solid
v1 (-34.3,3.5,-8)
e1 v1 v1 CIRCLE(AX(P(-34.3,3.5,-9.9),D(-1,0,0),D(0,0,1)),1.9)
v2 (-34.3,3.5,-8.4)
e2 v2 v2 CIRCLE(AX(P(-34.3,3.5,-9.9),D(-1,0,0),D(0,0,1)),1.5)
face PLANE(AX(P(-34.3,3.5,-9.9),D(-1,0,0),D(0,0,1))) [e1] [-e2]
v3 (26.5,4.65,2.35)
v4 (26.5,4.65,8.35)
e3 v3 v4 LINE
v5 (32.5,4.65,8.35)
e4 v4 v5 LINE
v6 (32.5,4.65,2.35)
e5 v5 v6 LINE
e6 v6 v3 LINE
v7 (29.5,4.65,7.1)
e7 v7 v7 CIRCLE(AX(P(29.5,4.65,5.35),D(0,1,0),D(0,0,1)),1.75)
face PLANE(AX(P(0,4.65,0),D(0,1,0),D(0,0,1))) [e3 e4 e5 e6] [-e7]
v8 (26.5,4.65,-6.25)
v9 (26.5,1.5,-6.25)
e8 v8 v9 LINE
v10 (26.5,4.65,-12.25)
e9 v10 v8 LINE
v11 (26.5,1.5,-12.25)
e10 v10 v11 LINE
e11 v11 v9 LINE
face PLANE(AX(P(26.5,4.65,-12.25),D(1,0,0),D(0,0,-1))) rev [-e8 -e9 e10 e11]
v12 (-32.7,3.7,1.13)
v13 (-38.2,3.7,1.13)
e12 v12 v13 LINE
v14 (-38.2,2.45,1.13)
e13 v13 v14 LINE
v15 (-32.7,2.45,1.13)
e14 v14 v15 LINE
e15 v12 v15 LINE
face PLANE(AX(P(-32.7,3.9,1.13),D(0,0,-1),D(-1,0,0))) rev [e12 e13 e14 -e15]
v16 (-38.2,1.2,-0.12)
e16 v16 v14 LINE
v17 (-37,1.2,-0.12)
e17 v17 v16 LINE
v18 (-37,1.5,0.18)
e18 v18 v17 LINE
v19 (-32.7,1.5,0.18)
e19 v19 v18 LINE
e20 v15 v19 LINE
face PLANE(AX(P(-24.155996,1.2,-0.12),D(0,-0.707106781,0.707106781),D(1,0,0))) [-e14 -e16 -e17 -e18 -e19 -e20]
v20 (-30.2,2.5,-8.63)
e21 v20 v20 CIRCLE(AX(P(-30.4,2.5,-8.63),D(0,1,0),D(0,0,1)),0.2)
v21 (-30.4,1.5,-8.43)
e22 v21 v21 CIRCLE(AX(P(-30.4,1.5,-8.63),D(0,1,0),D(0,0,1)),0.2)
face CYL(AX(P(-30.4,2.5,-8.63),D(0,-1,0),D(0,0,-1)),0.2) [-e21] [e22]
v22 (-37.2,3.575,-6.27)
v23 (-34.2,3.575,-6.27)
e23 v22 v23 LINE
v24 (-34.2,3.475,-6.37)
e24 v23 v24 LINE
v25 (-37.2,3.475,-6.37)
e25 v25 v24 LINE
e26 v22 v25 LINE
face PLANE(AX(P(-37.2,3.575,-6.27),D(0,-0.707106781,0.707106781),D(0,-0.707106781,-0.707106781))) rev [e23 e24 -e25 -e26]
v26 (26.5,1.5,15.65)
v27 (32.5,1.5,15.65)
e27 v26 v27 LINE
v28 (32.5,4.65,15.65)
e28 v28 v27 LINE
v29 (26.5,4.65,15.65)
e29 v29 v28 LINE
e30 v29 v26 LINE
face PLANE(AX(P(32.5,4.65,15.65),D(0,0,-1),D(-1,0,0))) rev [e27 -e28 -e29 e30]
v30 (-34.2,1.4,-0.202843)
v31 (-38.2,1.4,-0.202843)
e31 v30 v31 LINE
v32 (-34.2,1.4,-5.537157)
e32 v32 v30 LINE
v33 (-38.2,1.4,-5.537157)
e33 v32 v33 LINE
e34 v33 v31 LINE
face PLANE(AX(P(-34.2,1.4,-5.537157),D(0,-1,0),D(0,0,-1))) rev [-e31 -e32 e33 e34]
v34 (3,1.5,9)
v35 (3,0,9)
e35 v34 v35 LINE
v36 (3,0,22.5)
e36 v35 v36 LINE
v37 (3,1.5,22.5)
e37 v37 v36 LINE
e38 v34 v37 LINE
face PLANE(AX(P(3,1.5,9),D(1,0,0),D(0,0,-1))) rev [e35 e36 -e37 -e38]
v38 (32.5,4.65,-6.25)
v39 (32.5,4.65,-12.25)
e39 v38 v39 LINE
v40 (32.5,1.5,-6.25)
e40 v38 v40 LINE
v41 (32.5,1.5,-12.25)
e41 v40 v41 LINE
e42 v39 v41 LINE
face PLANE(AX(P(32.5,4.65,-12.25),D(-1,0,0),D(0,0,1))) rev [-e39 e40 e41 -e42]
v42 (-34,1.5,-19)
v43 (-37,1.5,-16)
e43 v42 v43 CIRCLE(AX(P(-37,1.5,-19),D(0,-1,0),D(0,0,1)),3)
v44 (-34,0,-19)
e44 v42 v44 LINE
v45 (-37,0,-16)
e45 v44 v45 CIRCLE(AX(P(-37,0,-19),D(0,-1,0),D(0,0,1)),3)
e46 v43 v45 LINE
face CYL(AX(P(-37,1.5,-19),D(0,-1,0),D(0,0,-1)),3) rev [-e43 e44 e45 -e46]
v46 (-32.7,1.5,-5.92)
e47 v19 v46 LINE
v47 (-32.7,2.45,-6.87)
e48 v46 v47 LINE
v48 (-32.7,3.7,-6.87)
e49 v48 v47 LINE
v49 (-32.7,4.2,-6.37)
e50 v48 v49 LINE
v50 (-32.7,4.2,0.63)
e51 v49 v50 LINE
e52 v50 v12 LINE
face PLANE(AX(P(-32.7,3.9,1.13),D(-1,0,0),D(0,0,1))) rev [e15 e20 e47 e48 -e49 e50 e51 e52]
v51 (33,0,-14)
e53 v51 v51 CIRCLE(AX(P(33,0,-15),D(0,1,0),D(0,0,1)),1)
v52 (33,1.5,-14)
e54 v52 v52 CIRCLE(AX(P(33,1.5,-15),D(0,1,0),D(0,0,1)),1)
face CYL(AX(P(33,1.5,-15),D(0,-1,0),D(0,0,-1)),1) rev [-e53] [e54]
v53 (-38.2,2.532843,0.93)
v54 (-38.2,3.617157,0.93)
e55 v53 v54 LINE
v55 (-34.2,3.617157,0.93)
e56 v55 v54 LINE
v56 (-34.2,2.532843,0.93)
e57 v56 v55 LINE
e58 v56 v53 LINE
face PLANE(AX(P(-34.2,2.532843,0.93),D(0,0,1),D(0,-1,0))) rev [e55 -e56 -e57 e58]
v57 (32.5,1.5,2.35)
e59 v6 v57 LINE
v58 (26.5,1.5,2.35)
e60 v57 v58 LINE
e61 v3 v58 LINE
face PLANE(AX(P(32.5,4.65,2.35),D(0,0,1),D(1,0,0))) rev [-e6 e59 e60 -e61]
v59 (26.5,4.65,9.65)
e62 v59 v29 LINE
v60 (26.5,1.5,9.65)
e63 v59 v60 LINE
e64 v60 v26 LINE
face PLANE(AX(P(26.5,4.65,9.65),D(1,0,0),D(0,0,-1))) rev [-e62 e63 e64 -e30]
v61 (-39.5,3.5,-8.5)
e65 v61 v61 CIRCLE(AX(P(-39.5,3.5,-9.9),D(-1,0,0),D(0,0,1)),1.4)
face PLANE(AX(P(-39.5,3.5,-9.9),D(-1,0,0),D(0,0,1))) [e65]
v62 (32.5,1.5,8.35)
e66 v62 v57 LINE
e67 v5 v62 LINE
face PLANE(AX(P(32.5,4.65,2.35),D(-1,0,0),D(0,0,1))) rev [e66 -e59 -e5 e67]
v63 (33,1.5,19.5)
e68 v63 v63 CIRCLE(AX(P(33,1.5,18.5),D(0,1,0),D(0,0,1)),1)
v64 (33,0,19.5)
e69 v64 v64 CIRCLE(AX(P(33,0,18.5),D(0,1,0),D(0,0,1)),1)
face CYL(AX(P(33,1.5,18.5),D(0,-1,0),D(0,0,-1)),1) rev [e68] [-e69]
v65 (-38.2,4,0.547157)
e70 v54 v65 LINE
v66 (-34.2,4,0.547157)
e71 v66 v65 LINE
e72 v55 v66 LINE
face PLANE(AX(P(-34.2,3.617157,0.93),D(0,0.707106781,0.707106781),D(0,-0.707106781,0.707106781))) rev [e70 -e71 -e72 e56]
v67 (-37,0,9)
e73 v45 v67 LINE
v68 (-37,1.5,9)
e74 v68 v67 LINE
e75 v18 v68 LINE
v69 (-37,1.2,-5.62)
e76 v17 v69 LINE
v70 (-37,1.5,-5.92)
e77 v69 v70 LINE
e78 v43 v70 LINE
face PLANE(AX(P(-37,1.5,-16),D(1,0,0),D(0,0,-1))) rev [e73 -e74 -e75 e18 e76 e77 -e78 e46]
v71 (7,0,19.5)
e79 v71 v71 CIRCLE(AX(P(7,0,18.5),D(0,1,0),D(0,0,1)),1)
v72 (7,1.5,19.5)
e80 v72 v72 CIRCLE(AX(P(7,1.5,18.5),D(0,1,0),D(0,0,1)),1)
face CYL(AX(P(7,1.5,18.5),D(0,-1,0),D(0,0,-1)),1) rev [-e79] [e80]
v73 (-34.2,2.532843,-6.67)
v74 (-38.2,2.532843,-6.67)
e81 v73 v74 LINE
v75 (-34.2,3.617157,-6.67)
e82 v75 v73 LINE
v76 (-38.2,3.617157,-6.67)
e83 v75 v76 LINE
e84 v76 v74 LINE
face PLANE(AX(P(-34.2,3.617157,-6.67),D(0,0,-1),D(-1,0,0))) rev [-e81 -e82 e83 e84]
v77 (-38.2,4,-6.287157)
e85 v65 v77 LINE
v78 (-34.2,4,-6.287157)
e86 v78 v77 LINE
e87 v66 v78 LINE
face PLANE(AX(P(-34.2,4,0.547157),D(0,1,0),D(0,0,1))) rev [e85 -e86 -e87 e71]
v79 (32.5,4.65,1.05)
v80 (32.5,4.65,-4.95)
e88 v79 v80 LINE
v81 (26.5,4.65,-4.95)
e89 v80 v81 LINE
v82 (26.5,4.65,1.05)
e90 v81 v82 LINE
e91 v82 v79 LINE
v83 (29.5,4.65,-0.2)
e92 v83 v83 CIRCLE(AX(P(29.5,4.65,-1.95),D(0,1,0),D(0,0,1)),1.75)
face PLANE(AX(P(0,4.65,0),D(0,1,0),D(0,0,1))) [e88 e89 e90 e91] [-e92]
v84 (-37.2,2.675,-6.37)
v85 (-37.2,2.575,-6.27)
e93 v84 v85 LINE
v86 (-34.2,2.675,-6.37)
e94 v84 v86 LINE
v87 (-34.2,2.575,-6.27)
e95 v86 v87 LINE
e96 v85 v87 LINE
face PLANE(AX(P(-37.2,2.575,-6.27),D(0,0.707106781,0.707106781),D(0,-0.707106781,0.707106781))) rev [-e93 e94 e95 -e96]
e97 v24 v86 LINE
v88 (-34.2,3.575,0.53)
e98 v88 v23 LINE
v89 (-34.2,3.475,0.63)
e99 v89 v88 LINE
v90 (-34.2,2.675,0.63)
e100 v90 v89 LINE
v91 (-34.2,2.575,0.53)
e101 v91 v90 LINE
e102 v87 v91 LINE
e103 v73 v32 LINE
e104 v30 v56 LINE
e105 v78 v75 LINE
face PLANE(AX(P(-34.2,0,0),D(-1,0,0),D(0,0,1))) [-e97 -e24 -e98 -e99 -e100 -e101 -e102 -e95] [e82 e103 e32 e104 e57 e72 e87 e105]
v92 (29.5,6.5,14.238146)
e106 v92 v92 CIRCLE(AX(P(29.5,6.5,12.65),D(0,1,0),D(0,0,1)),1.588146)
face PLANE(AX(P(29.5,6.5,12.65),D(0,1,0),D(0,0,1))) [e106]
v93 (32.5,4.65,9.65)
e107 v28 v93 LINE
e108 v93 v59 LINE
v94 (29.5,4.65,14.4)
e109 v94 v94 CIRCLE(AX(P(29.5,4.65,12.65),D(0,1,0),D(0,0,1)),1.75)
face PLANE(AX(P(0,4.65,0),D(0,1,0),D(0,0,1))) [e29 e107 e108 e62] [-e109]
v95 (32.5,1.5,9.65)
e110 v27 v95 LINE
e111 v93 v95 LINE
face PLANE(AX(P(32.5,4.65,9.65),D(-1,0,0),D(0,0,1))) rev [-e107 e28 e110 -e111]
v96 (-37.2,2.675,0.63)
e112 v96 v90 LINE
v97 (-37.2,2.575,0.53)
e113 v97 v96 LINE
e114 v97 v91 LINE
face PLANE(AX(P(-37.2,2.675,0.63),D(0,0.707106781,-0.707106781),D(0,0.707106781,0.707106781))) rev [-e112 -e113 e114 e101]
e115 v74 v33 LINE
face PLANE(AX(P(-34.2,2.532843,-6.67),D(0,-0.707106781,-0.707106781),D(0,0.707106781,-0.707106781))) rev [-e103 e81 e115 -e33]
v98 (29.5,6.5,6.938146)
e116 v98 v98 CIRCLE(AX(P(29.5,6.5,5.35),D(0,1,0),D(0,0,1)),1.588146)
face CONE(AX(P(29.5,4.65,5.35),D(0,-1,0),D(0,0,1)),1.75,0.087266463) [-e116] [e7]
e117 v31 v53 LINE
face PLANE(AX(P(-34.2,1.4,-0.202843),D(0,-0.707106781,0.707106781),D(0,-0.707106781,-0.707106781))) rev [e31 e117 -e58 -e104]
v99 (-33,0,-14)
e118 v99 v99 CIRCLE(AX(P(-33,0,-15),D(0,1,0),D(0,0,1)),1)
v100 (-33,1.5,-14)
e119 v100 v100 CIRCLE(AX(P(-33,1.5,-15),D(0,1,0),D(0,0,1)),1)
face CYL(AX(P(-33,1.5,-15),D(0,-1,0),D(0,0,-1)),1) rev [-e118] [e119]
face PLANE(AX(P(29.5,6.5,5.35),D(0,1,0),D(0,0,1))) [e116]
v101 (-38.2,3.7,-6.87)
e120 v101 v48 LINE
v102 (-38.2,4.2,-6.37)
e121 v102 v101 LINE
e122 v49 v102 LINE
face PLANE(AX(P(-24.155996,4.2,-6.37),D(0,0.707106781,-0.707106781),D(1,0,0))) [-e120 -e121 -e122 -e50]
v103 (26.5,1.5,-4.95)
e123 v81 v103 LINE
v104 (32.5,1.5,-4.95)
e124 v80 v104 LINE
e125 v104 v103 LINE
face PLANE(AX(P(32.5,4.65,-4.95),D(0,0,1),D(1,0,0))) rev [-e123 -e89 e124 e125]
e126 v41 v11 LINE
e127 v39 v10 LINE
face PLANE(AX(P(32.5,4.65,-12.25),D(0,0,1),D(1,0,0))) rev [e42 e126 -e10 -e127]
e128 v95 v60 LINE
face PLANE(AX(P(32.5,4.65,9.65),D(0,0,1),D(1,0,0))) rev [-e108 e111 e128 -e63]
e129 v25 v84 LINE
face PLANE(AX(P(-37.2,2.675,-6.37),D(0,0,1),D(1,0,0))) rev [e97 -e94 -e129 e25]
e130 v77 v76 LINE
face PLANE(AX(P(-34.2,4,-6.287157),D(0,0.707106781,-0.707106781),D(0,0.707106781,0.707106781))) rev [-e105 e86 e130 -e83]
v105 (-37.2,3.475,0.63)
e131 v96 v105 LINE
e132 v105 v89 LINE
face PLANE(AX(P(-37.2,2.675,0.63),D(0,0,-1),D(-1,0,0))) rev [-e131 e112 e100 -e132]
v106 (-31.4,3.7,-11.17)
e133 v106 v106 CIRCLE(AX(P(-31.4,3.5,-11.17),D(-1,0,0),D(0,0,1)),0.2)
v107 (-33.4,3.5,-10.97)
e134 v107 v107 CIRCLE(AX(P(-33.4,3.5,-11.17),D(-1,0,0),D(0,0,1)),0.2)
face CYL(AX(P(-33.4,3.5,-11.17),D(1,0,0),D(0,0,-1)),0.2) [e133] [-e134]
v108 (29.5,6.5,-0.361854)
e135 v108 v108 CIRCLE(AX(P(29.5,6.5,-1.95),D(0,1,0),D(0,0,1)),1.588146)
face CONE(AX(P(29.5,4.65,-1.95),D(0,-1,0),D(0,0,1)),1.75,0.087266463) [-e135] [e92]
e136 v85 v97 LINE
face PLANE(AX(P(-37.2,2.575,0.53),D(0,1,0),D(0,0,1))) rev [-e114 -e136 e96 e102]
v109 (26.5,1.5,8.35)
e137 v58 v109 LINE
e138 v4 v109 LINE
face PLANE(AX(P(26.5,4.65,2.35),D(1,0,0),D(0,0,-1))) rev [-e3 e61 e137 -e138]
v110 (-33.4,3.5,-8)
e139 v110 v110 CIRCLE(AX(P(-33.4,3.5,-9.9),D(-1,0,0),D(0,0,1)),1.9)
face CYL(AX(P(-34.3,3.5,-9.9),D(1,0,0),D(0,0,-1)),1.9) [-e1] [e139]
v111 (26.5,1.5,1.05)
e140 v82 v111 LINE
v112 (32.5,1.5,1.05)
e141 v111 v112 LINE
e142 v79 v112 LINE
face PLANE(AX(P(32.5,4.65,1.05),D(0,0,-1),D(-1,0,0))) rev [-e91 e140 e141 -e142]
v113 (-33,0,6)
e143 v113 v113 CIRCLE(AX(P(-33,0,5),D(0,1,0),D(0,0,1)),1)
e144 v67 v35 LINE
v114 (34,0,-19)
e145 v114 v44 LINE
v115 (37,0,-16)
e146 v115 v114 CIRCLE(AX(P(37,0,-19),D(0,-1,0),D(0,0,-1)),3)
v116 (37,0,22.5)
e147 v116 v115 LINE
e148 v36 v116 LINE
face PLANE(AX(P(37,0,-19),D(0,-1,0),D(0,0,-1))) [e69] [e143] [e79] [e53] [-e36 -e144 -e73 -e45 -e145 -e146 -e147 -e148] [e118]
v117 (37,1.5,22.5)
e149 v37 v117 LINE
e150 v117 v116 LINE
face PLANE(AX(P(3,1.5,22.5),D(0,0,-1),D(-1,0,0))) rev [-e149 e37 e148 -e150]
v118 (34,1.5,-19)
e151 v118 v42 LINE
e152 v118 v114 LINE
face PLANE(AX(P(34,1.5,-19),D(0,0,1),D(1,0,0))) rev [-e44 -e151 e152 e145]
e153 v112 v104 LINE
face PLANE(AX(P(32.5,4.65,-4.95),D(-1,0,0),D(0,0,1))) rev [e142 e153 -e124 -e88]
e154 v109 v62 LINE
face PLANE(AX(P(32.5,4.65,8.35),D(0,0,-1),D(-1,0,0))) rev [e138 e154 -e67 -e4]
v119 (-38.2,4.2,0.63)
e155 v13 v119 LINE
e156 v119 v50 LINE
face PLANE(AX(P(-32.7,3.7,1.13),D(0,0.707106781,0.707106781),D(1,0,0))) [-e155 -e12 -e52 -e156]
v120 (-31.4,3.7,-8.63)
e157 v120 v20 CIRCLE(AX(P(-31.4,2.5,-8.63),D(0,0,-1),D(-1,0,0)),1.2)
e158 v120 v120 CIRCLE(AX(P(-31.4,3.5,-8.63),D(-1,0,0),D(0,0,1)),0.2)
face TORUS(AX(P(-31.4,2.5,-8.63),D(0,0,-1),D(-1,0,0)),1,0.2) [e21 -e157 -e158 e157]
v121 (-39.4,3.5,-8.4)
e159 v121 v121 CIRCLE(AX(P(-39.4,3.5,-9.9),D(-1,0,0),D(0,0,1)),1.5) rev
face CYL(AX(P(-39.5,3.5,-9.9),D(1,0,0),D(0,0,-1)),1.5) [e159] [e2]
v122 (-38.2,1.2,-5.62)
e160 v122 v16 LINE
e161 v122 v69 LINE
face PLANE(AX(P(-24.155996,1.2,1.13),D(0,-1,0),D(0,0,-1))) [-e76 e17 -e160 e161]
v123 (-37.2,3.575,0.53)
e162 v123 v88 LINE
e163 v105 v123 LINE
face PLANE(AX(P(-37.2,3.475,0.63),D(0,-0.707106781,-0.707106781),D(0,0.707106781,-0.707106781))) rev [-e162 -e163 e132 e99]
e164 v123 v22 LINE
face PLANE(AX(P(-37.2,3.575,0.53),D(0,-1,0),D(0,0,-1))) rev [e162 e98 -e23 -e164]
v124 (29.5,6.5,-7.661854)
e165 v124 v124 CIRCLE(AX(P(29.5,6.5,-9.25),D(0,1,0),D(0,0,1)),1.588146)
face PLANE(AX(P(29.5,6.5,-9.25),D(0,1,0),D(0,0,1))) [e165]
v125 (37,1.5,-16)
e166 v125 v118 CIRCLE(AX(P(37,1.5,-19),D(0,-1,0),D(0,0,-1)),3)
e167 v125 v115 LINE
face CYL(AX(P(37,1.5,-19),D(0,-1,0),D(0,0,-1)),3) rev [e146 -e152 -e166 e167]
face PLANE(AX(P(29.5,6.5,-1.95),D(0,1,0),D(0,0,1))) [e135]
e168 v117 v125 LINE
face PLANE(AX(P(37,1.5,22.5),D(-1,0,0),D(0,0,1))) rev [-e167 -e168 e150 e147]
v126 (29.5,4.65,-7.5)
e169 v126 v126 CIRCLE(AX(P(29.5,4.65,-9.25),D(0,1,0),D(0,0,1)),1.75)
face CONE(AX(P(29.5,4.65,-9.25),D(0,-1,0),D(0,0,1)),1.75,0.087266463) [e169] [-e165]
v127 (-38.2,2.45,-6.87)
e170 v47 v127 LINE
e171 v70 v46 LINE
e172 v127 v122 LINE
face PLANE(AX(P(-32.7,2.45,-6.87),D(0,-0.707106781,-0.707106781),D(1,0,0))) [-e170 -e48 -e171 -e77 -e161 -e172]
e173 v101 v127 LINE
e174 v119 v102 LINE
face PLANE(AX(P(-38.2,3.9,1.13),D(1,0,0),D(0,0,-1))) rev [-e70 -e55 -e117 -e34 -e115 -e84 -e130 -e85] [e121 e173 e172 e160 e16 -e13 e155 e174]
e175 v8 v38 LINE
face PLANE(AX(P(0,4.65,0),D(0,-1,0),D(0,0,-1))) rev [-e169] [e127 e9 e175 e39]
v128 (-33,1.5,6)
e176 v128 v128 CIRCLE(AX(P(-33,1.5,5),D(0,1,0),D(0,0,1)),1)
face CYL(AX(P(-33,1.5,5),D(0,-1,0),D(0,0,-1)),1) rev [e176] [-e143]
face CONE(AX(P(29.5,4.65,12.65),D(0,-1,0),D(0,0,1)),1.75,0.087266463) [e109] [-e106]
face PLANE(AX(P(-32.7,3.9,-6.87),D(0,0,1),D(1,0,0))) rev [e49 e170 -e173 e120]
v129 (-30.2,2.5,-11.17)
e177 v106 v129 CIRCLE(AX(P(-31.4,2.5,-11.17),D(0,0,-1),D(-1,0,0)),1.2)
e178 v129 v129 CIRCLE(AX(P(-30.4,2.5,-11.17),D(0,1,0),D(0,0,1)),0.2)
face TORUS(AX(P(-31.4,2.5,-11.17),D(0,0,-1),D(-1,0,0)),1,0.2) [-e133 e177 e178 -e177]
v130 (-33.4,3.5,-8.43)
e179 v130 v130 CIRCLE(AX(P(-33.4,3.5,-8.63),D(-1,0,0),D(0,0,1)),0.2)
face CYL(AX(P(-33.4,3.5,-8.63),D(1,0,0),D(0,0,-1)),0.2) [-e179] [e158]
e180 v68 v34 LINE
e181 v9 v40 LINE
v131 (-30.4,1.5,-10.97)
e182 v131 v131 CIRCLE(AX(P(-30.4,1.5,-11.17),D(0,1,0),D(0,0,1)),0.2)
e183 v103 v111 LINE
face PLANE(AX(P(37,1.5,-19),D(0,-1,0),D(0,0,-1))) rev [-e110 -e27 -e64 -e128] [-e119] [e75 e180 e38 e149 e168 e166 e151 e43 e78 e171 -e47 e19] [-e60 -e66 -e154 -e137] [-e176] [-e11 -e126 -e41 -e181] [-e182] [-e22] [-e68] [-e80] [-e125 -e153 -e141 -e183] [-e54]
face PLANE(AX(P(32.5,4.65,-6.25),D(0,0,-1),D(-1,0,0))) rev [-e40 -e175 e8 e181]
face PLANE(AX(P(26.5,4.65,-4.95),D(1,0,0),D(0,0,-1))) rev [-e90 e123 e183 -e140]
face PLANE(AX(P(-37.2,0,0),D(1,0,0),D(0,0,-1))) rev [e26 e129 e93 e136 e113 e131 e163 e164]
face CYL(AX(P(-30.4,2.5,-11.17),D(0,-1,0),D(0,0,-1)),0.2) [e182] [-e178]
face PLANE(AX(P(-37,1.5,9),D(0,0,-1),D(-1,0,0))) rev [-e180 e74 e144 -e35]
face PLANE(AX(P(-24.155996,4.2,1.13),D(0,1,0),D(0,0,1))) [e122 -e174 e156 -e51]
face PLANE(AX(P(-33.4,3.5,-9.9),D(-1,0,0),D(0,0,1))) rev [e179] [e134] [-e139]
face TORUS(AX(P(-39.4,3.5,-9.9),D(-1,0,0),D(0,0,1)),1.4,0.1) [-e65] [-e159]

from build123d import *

# Parameters (mm, degrees)
SKETCH_1_R                = 1
EXTRUDE_1_DEPTH           = 1.5
SKETCH_2_W                = 6
SKETCH_2_H                = 6
EXTRUDE_2_DEPTH           = 3.15
SKETCH_3_R                = 1.75
EXTRUDE_3_DEPTH           = 1.85
EXTRUDE_3_DRAFT           = 5
EXTRUDE_3_PROFILE_2_DEPTH = 1.85
EXTRUDE_3_PROFILE_2_DRAFT = 5
EXTRUDE_3_PROFILE_3_DEPTH = 1.85
EXTRUDE_3_PROFILE_3_DRAFT = 5
EXTRUDE_3_PROFILE_4_DEPTH = 1.85
EXTRUDE_3_PROFILE_4_DRAFT = 5
SKETCH_4_W                = 5.5
SKETCH_4_H                = 8
EXTRUDE_4_DEPTH           = 2.4
EXTRUDE_5_REACH           = 80.763
SKETCH_5_W                = 8
SKETCH_5_H                = 3
CHAMFER_1_SIZE            = 0.5
SKETCH_6_R                = 0.2
SKETCH_8_R                = 1.9
EXTRUDE_6_DEPTH           = 0.9
SKETCH_9_R                = 1.5
EXTRUDE_7_DEPTH           = 5.2
CUT_EXTRUDE_1_DEPTH       = 4
EXTRUDE_8_DEPTH           = 3
FILLET_1_R                = 0.1


with BuildPart() as part:
    # Эскиз1 → Бобышка-Вытянуть1 (new body)
    with BuildSketch(Plane(origin=(0, 0, 0), x_dir=(1, 0, 0), z_dir=(0, 1, 0))):
        with BuildLine():
            Line((-37, -9), (3, -9))
            Line((3, -9), (3, -22.5))
            Line((3, -22.5), (37, -22.5))
            Line((37, -22.5), (37, 16))
            ThreePointArc((37, 16), (34.878679656, 16.878679656), (34, 19))
            Line((34, 19), (-34, 19))
            ThreePointArc((-34, 19), (-34.878679656, 16.878679656), (-37, 16))
            Line((-37, 16), (-37, -9))
        make_face()
        with Locations(Location((-33, -5, 0), (0, 0, 270))):
            Circle(SKETCH_1_R, mode=Mode.SUBTRACT)
        with Locations(Location((33, -18.5, 0), (0, 0, 270))):
            Circle(SKETCH_1_R, mode=Mode.SUBTRACT)
        with Locations(Location((7, -18.5, 0), (0, 0, 270))):
            Circle(SKETCH_1_R, mode=Mode.SUBTRACT)
        with Locations(Location((-33, 15, 0), (0, 0, 270))):
            Circle(SKETCH_1_R, mode=Mode.SUBTRACT)
        with Locations(Location((33, 15, 0), (0, 0, 270))):
            Circle(SKETCH_1_R, mode=Mode.SUBTRACT)
    extrude(amount=EXTRUDE_1_DEPTH)

    # Эскиз2 → Бобышка-Вытянуть2 (add)
    with BuildSketch(Plane(origin=(0, 1.5, 0), x_dir=(1, 0, 0), z_dir=(0, 1, 0))):
        with Locations((29.5, 1.95)):
            Rectangle(SKETCH_2_W, SKETCH_2_H)
        with Locations((29.5, 9.25)):
            Rectangle(SKETCH_2_W, SKETCH_2_H)
        with Locations((29.5, -5.35)):
            Rectangle(SKETCH_2_W, SKETCH_2_H)
        with Locations((29.5, -12.65)):
            Rectangle(SKETCH_2_W, SKETCH_2_H)
    extrude(amount=EXTRUDE_2_DEPTH)


with BuildPart() as extrude_3_tool:
    # Эскиз3 → Бобышка-Вытянуть3 (with draft: the straight prism first)
    with BuildSketch(Plane(origin=(0, 4.65, 0), x_dir=(1, 0, 0), z_dir=(0, 1, 0))):
        with Locations((29.5, 9.25)):
            Circle(SKETCH_3_R)
    extrude(amount=EXTRUDE_3_DEPTH)
    # Бобышка-Вытянуть3: the draft: its side faces are tilted about the plane it starts from
    extrude_3_sides = [extrude_3_tool.faces().sort_by_distance(p)[0] for p in [
        (27.75, 5.575, -9.25),
    ]]
    draft(extrude_3_sides, Plane(origin=(0, 4.65, 0), x_dir=(1, 0, 0), z_dir=(0, 1, 0)), EXTRUDE_3_DRAFT)


with BuildPart() as part_1:
    add(part.part)

    # Бобышка-Вытянуть3: add extrude_3_tool
    add(extrude_3_tool.part)


with BuildPart() as extrude_3_profile_2_tool:
    # Эскиз3 → Бобышка-Вытянуть3 profile 2 (with draft: the straight prism first)
    with BuildSketch(Plane(origin=(0, 4.65, 0), x_dir=(1, 0, 0), z_dir=(0, 1, 0))):
        with Locations((29.5, 1.95)):
            Circle(SKETCH_3_R)
    extrude(amount=EXTRUDE_3_PROFILE_2_DEPTH)
    # Бобышка-Вытянуть3 profile 2: the draft: its side faces are tilted about the plane it starts from
    extrude_3_profile_2_sides = [extrude_3_profile_2_tool.faces().sort_by_distance(p)[0] for p in [
        (27.75, 5.575, -1.95),
    ]]
    draft(extrude_3_profile_2_sides, Plane(origin=(0, 4.65, 0), x_dir=(1, 0, 0), z_dir=(0, 1, 0)), EXTRUDE_3_PROFILE_2_DRAFT)


with BuildPart() as part_2:
    add(part_1.part)

    # Бобышка-Вытянуть3 profile 2: add extrude_3_profile_2_tool
    add(extrude_3_profile_2_tool.part)


with BuildPart() as extrude_3_profile_3_tool:
    # Эскиз3 → Бобышка-Вытянуть3 profile 3 (with draft: the straight prism first)
    with BuildSketch(Plane(origin=(0, 4.65, 0), x_dir=(1, 0, 0), z_dir=(0, 1, 0))):
        with Locations((29.5, -5.35)):
            Circle(SKETCH_3_R)
    extrude(amount=EXTRUDE_3_PROFILE_3_DEPTH)
    # Бобышка-Вытянуть3 profile 3: the draft: its side faces are tilted about the plane it starts from
    extrude_3_profile_3_sides = [extrude_3_profile_3_tool.faces().sort_by_distance(p)[0] for p in [
        (27.75, 5.575, 5.35),
    ]]
    draft(extrude_3_profile_3_sides, Plane(origin=(0, 4.65, 0), x_dir=(1, 0, 0), z_dir=(0, 1, 0)), EXTRUDE_3_PROFILE_3_DRAFT)


with BuildPart() as part_3:
    add(part_2.part)

    # Бобышка-Вытянуть3 profile 3: add extrude_3_profile_3_tool
    add(extrude_3_profile_3_tool.part)


with BuildPart() as extrude_3_profile_4_tool:
    # Эскиз3 → Бобышка-Вытянуть3 profile 4 (with draft: the straight prism first)
    with BuildSketch(Plane(origin=(0, 4.65, 0), x_dir=(1, 0, 0), z_dir=(0, 1, 0))):
        with Locations((29.5, -12.65)):
            Circle(SKETCH_3_R)
    extrude(amount=EXTRUDE_3_PROFILE_4_DEPTH)
    # Бобышка-Вытянуть3 profile 4: the draft: its side faces are tilted about the plane it starts from
    extrude_3_profile_4_sides = [extrude_3_profile_4_tool.faces().sort_by_distance(p)[0] for p in [
        (27.75, 5.575, 12.65),
    ]]
    draft(extrude_3_profile_4_sides, Plane(origin=(0, 4.65, 0), x_dir=(1, 0, 0), z_dir=(0, 1, 0)), EXTRUDE_3_PROFILE_4_DRAFT)


with BuildPart() as part_4:
    add(part_3.part)

    # Бобышка-Вытянуть3 profile 4: add extrude_3_profile_4_tool
    add(extrude_3_profile_4_tool.part)

    # Эскиз4 → Бобышка-Вытянуть4 (add)
    with BuildSketch(Plane(origin=(0, 1.5, 0), x_dir=(1, 0, 0), z_dir=(0, 1, 0))):
        with Locations((-35.45, 2.87)):
            Rectangle(SKETCH_4_W, SKETCH_4_H)
    extrude(amount=EXTRUDE_4_DEPTH)

    # Бобышка-Вытянуть5: up to this face of the body (flat: up to its plane)
    extrude_5_end = Plane(part_4.part.faces().sort_by_distance((-32.7, 2.7, -2.87))[0])
    # Эскиз5 → Бобышка-Вытянуть5 (add, up to the picked face)
    with BuildSketch(Plane.ZY.offset(38.2), mode=Mode.PRIVATE) as extrude_5_sk1:
        with Locations((-2.87, 2.7)):
            Rectangle(SKETCH_5_W, SKETCH_5_H)
    extrude_5_tool1 = split(extrude(extrude_5_sk1.sketch, amount=-EXTRUDE_5_REACH, mode=Mode.PRIVATE), bisect_by=extrude_5_end, keep=Keep.BOTH, mode=Mode.PRIVATE)
    add(extrude_5_tool1.solids().sort_by(Axis((-38.2, 2.7, -2.87), (1, 0, 0)))[0])

    # Фаска1
    chamfer_1_edges = [part_4.edges().sort_by_distance(p)[0] for p in [
        (-35.45, 4.2, -6.87),
        (-35.45, 4.2, 1.13),
    ]]
    chamfer(chamfer_1_edges, length=CHAMFER_1_SIZE)

    # Фаска2
    # the kernel refuses this chamfer: 1.25 mm, written as the material it takes off along each edge
    with BuildSketch(Plane(origin=(-45.915048964, 1.2, 1.13), x_dir=(0, -0.02749587661058649, -0.9996219169112968), z_dir=(1, 0, 0))) as chamfer_2_piece_1_section:
        with BuildLine():
            Line((1.285841494, 0), (-0.070683944, 1.283897242))
            Line((-0.070683944, 1.283897242), (-0.095674492, 1.283209845))
            ThreePointArc((-0.095674492, 1.283209845), (-0.042661534, 0.641747287), (-0.024990548, -0.000687397))
            Line((-0.024990548, -0.000687397), (0.000687397, -0.024990548))
            ThreePointArc((0.000687397, -0.024990548), (0.643122081, -0.007319562), (1.286528891, -0.024990548))
            Line((1.286528891, -0.024990548), (1.285841494, 0))
        make_face()
    chamfer_2_piece_1 = extrude(amount=8.915048964, mode=Mode.PRIVATE)
    chamfer_2_piece_1 = split(chamfer_2_piece_1, bisect_by=Plane(origin=(-41.457524482, 1.5, 0.565873804), z_dir=(0, -1, 0)), keep=Keep.TOP, mode=Mode.PRIVATE)
    add(chamfer_2_piece_1, mode=Mode.SUBTRACT)
    with BuildSketch(Plane(origin=(-45.915048964, 1.2, 1.13), x_dir=(0, -0.02749587661058649, -0.9996219169112968), z_dir=(1, 0, 0))) as chamfer_2_piece_2_section:
        with BuildLine():
            Line((1.285841494, 0), (-0.070683944, 1.283897242))
            Line((-0.070683944, 1.283897242), (-0.095674492, 1.283209845))
            ThreePointArc((-0.095674492, 1.283209845), (-0.042661534, 0.641747287), (-0.024990548, -0.000687397))
            Line((-0.024990548, -0.000687397), (0.000687397, -0.024990548))
            ThreePointArc((0.000687397, -0.024990548), (0.643122081, -0.007319562), (1.286528891, -0.024990548))
            Line((1.286528891, -0.024990548), (1.285841494, 0))
        make_face()
    chamfer_2_piece_2 = extrude(amount=8.915048964, mode=Mode.PRIVATE)
    chamfer_2_piece_2 = split(chamfer_2_piece_2, bisect_by=Plane(origin=(-41.457524482, 1.5, 0.835841418), z_dir=(0, 1, 0)), keep=Keep.TOP, mode=Mode.PRIVATE)
    add(chamfer_2_piece_2, mode=Mode.SUBTRACT)
    with BuildSketch(Plane(origin=(-45.915048964, 1.2, 1.13), x_dir=(0, -0.02749587661058649, -0.9996219169112968), z_dir=(1, 0, 0))) as chamfer_2_piece_3_section:
        with BuildLine():
            Line((1.285841494, 0), (-0.070683944, 1.283897242))
            Line((-0.070683944, 1.283897242), (-0.095674492, 1.283209845))
            ThreePointArc((-0.095674492, 1.283209845), (-0.042661534, 0.641747287), (-0.024990548, -0.000687397))
            Line((-0.024990548, -0.000687397), (0.000687397, -0.024990548))
            ThreePointArc((0.000687397, -0.024990548), (0.643122081, -0.007319562), (1.286528891, -0.024990548))
            Line((1.286528891, -0.024990548), (1.285841494, 0))
        make_face()
    chamfer_2_piece_3 = extrude(amount=16.630097928, mode=Mode.PRIVATE)
    chamfer_2_piece_3 = split(chamfer_2_piece_3, bisect_by=Plane(origin=(-37, 1.834493802, 0.835841418), z_dir=(1, 0, 0)), keep=Keep.TOP, mode=Mode.PRIVATE)
    chamfer_2_piece_3 = split(chamfer_2_piece_3, bisect_by=Plane(origin=(-33.142475518, 1.5, 0.835841418), z_dir=(0, 1, 0)), keep=Keep.TOP, mode=Mode.PRIVATE)
    add(chamfer_2_piece_3, mode=Mode.SUBTRACT)
    with BuildSketch(Plane(origin=(-45.915048964, 1.2, -6.87), x_dir=(0, 0.9996219169112968, -0.027495876610586317), z_dir=(1, 0, 0))) as chamfer_2_piece_4_section:
        with BuildLine():
            Line((1.285841494, 0), (-0.070683944, 1.283897242))
            Line((-0.070683944, 1.283897242), (-0.095674492, 1.283209845))
            ThreePointArc((-0.095674492, 1.283209845), (-0.042661534, 0.641747287), (-0.024990548, -0.000687397))
            Line((-0.024990548, -0.000687397), (0.000687397, -0.024990548))
            ThreePointArc((0.000687397, -0.024990548), (0.643122081, -0.007319562), (1.286528891, -0.024990548))
            Line((1.286528891, -0.024990548), (1.285841494, 0))
        make_face()
    chamfer_2_piece_4 = extrude(amount=8.915048964, mode=Mode.PRIVATE)
    chamfer_2_piece_4 = split(chamfer_2_piece_4, bisect_by=Plane(origin=(-41.457524482, 1.5, -6.575841418), z_dir=(0, 1, 0)), keep=Keep.TOP, mode=Mode.PRIVATE)
    add(chamfer_2_piece_4, mode=Mode.SUBTRACT)
    with BuildSketch(Plane(origin=(-45.915048964, 1.2, -6.87), x_dir=(0, 0.9996219169112968, -0.027495876610586317), z_dir=(1, 0, 0))) as chamfer_2_piece_5_section:
        with BuildLine():
            Line((1.285841494, 0), (-0.070683944, 1.283897242))
            Line((-0.070683944, 1.283897242), (-0.095674492, 1.283209845))
            ThreePointArc((-0.095674492, 1.283209845), (-0.042661534, 0.641747287), (-0.024990548, -0.000687397))
            Line((-0.024990548, -0.000687397), (0.000687397, -0.024990548))
            ThreePointArc((0.000687397, -0.024990548), (0.643122081, -0.007319562), (1.286528891, -0.024990548))
            Line((1.286528891, -0.024990548), (1.285841494, 0))
        make_face()
    chamfer_2_piece_5 = extrude(amount=8.915048964, mode=Mode.PRIVATE)
    chamfer_2_piece_5 = split(chamfer_2_piece_5, bisect_by=Plane(origin=(-41.457524482, 1.5, -6.305873804), z_dir=(0, -1, 0)), keep=Keep.TOP, mode=Mode.PRIVATE)
    add(chamfer_2_piece_5, mode=Mode.SUBTRACT)
    with BuildSketch(Plane(origin=(-45.915048964, 1.2, -6.87), x_dir=(0, 0.9996219169112968, -0.027495876610586317), z_dir=(1, 0, 0))) as chamfer_2_piece_6_section:
        with BuildLine():
            Line((1.285841494, 0), (-0.070683944, 1.283897242))
            Line((-0.070683944, 1.283897242), (-0.095674492, 1.283209845))
            ThreePointArc((-0.095674492, 1.283209845), (-0.042661534, 0.641747287), (-0.024990548, -0.000687397))
            Line((-0.024990548, -0.000687397), (0.000687397, -0.024990548))
            ThreePointArc((0.000687397, -0.024990548), (0.643122081, -0.007319562), (1.286528891, -0.024990548))
            Line((1.286528891, -0.024990548), (1.285841494, 0))
        make_face()
    chamfer_2_piece_6 = extrude(amount=16.630097928, mode=Mode.PRIVATE)
    chamfer_2_piece_6 = split(chamfer_2_piece_6, bisect_by=Plane(origin=(-37, 1.834493802, -6.575841418), z_dir=(1, 0, 0)), keep=Keep.TOP, mode=Mode.PRIVATE)
    chamfer_2_piece_6 = split(chamfer_2_piece_6, bisect_by=Plane(origin=(-33.142475518, 1.5, -6.575841418), z_dir=(0, 1, 0)), keep=Keep.TOP, mode=Mode.PRIVATE)
    add(chamfer_2_piece_6, mode=Mode.SUBTRACT)

    # По траектории1: sweep along a path in Эскиз7
    with BuildLine(Plane.XY) as sweep_1_path:
        Line((-30.4, 1.5), (-30.4, 2.5))
        ThreePointArc((-30.4, 2.5), (-30.692893219, 3.207106781), (-31.4, 3.5))
        Line((-31.4, 3.5), (-33.4, 3.5))
    # Эскиз6 → По траектории1 (sweep)
    with BuildSketch(Plane(origin=(0, 1.5, 0), x_dir=(1, 0, 0), z_dir=(0, 1, 0))):
        with Locations((-30.4, 11.17)):
            Circle(SKETCH_6_R)
        with Locations((-30.4, 8.63)):
            Circle(SKETCH_6_R)
    sweep(path=sweep_1_path.line)

    # Эскиз8 → Бобышка-Вытянуть6 (add)
    with BuildSketch(Plane.ZY.offset(33.4)):
        with Locations((-9.9, 3.5)):
            Circle(SKETCH_8_R)
    extrude(amount=EXTRUDE_6_DEPTH)

    # Эскиз9 → Бобышка-Вытянуть7 (add)
    with BuildSketch(Plane.ZY.offset(34.3)):
        with Locations((-9.9, 3.5)):
            Circle(SKETCH_9_R)
    extrude(amount=EXTRUDE_7_DEPTH)

    # Эскиз16 → Вырез-Вытянуть1 (cut)
    with BuildSketch(Plane.ZY.offset(38.2)):
        Polygon((-6.67, 3.617157288), (-6.67, 2.532842712), (-5.537157288, 1.4), (-0.202842712, 1.4), (0.93, 2.532842712), (0.93, 3.617157288), (0.547157288, 4), (-6.287157288, 4), align=None)
    extrude(amount=-CUT_EXTRUDE_1_DEPTH, mode=Mode.SUBTRACT)

    # Эскиз17 → Бобышка-Вытянуть8 (add)
    with BuildSketch(Plane.ZY.offset(34.2)):
        Polygon((-6.27, 3.575), (-6.37, 3.475), (-6.37, 2.675), (-6.27, 2.575), (0.53, 2.575), (0.63, 2.675), (0.63, 3.475), (0.53, 3.575), align=None)
    extrude(amount=EXTRUDE_8_DEPTH)

    # Скругление1
    fillet_1_edges = [part_4.edges().sort_by_distance(p)[0] for p in [
        (-39.5, 3.5, -11.4),
    ]]
    fillet(fillet_1_edges, radius=FILLET_1_R)


solid = part_4.part
